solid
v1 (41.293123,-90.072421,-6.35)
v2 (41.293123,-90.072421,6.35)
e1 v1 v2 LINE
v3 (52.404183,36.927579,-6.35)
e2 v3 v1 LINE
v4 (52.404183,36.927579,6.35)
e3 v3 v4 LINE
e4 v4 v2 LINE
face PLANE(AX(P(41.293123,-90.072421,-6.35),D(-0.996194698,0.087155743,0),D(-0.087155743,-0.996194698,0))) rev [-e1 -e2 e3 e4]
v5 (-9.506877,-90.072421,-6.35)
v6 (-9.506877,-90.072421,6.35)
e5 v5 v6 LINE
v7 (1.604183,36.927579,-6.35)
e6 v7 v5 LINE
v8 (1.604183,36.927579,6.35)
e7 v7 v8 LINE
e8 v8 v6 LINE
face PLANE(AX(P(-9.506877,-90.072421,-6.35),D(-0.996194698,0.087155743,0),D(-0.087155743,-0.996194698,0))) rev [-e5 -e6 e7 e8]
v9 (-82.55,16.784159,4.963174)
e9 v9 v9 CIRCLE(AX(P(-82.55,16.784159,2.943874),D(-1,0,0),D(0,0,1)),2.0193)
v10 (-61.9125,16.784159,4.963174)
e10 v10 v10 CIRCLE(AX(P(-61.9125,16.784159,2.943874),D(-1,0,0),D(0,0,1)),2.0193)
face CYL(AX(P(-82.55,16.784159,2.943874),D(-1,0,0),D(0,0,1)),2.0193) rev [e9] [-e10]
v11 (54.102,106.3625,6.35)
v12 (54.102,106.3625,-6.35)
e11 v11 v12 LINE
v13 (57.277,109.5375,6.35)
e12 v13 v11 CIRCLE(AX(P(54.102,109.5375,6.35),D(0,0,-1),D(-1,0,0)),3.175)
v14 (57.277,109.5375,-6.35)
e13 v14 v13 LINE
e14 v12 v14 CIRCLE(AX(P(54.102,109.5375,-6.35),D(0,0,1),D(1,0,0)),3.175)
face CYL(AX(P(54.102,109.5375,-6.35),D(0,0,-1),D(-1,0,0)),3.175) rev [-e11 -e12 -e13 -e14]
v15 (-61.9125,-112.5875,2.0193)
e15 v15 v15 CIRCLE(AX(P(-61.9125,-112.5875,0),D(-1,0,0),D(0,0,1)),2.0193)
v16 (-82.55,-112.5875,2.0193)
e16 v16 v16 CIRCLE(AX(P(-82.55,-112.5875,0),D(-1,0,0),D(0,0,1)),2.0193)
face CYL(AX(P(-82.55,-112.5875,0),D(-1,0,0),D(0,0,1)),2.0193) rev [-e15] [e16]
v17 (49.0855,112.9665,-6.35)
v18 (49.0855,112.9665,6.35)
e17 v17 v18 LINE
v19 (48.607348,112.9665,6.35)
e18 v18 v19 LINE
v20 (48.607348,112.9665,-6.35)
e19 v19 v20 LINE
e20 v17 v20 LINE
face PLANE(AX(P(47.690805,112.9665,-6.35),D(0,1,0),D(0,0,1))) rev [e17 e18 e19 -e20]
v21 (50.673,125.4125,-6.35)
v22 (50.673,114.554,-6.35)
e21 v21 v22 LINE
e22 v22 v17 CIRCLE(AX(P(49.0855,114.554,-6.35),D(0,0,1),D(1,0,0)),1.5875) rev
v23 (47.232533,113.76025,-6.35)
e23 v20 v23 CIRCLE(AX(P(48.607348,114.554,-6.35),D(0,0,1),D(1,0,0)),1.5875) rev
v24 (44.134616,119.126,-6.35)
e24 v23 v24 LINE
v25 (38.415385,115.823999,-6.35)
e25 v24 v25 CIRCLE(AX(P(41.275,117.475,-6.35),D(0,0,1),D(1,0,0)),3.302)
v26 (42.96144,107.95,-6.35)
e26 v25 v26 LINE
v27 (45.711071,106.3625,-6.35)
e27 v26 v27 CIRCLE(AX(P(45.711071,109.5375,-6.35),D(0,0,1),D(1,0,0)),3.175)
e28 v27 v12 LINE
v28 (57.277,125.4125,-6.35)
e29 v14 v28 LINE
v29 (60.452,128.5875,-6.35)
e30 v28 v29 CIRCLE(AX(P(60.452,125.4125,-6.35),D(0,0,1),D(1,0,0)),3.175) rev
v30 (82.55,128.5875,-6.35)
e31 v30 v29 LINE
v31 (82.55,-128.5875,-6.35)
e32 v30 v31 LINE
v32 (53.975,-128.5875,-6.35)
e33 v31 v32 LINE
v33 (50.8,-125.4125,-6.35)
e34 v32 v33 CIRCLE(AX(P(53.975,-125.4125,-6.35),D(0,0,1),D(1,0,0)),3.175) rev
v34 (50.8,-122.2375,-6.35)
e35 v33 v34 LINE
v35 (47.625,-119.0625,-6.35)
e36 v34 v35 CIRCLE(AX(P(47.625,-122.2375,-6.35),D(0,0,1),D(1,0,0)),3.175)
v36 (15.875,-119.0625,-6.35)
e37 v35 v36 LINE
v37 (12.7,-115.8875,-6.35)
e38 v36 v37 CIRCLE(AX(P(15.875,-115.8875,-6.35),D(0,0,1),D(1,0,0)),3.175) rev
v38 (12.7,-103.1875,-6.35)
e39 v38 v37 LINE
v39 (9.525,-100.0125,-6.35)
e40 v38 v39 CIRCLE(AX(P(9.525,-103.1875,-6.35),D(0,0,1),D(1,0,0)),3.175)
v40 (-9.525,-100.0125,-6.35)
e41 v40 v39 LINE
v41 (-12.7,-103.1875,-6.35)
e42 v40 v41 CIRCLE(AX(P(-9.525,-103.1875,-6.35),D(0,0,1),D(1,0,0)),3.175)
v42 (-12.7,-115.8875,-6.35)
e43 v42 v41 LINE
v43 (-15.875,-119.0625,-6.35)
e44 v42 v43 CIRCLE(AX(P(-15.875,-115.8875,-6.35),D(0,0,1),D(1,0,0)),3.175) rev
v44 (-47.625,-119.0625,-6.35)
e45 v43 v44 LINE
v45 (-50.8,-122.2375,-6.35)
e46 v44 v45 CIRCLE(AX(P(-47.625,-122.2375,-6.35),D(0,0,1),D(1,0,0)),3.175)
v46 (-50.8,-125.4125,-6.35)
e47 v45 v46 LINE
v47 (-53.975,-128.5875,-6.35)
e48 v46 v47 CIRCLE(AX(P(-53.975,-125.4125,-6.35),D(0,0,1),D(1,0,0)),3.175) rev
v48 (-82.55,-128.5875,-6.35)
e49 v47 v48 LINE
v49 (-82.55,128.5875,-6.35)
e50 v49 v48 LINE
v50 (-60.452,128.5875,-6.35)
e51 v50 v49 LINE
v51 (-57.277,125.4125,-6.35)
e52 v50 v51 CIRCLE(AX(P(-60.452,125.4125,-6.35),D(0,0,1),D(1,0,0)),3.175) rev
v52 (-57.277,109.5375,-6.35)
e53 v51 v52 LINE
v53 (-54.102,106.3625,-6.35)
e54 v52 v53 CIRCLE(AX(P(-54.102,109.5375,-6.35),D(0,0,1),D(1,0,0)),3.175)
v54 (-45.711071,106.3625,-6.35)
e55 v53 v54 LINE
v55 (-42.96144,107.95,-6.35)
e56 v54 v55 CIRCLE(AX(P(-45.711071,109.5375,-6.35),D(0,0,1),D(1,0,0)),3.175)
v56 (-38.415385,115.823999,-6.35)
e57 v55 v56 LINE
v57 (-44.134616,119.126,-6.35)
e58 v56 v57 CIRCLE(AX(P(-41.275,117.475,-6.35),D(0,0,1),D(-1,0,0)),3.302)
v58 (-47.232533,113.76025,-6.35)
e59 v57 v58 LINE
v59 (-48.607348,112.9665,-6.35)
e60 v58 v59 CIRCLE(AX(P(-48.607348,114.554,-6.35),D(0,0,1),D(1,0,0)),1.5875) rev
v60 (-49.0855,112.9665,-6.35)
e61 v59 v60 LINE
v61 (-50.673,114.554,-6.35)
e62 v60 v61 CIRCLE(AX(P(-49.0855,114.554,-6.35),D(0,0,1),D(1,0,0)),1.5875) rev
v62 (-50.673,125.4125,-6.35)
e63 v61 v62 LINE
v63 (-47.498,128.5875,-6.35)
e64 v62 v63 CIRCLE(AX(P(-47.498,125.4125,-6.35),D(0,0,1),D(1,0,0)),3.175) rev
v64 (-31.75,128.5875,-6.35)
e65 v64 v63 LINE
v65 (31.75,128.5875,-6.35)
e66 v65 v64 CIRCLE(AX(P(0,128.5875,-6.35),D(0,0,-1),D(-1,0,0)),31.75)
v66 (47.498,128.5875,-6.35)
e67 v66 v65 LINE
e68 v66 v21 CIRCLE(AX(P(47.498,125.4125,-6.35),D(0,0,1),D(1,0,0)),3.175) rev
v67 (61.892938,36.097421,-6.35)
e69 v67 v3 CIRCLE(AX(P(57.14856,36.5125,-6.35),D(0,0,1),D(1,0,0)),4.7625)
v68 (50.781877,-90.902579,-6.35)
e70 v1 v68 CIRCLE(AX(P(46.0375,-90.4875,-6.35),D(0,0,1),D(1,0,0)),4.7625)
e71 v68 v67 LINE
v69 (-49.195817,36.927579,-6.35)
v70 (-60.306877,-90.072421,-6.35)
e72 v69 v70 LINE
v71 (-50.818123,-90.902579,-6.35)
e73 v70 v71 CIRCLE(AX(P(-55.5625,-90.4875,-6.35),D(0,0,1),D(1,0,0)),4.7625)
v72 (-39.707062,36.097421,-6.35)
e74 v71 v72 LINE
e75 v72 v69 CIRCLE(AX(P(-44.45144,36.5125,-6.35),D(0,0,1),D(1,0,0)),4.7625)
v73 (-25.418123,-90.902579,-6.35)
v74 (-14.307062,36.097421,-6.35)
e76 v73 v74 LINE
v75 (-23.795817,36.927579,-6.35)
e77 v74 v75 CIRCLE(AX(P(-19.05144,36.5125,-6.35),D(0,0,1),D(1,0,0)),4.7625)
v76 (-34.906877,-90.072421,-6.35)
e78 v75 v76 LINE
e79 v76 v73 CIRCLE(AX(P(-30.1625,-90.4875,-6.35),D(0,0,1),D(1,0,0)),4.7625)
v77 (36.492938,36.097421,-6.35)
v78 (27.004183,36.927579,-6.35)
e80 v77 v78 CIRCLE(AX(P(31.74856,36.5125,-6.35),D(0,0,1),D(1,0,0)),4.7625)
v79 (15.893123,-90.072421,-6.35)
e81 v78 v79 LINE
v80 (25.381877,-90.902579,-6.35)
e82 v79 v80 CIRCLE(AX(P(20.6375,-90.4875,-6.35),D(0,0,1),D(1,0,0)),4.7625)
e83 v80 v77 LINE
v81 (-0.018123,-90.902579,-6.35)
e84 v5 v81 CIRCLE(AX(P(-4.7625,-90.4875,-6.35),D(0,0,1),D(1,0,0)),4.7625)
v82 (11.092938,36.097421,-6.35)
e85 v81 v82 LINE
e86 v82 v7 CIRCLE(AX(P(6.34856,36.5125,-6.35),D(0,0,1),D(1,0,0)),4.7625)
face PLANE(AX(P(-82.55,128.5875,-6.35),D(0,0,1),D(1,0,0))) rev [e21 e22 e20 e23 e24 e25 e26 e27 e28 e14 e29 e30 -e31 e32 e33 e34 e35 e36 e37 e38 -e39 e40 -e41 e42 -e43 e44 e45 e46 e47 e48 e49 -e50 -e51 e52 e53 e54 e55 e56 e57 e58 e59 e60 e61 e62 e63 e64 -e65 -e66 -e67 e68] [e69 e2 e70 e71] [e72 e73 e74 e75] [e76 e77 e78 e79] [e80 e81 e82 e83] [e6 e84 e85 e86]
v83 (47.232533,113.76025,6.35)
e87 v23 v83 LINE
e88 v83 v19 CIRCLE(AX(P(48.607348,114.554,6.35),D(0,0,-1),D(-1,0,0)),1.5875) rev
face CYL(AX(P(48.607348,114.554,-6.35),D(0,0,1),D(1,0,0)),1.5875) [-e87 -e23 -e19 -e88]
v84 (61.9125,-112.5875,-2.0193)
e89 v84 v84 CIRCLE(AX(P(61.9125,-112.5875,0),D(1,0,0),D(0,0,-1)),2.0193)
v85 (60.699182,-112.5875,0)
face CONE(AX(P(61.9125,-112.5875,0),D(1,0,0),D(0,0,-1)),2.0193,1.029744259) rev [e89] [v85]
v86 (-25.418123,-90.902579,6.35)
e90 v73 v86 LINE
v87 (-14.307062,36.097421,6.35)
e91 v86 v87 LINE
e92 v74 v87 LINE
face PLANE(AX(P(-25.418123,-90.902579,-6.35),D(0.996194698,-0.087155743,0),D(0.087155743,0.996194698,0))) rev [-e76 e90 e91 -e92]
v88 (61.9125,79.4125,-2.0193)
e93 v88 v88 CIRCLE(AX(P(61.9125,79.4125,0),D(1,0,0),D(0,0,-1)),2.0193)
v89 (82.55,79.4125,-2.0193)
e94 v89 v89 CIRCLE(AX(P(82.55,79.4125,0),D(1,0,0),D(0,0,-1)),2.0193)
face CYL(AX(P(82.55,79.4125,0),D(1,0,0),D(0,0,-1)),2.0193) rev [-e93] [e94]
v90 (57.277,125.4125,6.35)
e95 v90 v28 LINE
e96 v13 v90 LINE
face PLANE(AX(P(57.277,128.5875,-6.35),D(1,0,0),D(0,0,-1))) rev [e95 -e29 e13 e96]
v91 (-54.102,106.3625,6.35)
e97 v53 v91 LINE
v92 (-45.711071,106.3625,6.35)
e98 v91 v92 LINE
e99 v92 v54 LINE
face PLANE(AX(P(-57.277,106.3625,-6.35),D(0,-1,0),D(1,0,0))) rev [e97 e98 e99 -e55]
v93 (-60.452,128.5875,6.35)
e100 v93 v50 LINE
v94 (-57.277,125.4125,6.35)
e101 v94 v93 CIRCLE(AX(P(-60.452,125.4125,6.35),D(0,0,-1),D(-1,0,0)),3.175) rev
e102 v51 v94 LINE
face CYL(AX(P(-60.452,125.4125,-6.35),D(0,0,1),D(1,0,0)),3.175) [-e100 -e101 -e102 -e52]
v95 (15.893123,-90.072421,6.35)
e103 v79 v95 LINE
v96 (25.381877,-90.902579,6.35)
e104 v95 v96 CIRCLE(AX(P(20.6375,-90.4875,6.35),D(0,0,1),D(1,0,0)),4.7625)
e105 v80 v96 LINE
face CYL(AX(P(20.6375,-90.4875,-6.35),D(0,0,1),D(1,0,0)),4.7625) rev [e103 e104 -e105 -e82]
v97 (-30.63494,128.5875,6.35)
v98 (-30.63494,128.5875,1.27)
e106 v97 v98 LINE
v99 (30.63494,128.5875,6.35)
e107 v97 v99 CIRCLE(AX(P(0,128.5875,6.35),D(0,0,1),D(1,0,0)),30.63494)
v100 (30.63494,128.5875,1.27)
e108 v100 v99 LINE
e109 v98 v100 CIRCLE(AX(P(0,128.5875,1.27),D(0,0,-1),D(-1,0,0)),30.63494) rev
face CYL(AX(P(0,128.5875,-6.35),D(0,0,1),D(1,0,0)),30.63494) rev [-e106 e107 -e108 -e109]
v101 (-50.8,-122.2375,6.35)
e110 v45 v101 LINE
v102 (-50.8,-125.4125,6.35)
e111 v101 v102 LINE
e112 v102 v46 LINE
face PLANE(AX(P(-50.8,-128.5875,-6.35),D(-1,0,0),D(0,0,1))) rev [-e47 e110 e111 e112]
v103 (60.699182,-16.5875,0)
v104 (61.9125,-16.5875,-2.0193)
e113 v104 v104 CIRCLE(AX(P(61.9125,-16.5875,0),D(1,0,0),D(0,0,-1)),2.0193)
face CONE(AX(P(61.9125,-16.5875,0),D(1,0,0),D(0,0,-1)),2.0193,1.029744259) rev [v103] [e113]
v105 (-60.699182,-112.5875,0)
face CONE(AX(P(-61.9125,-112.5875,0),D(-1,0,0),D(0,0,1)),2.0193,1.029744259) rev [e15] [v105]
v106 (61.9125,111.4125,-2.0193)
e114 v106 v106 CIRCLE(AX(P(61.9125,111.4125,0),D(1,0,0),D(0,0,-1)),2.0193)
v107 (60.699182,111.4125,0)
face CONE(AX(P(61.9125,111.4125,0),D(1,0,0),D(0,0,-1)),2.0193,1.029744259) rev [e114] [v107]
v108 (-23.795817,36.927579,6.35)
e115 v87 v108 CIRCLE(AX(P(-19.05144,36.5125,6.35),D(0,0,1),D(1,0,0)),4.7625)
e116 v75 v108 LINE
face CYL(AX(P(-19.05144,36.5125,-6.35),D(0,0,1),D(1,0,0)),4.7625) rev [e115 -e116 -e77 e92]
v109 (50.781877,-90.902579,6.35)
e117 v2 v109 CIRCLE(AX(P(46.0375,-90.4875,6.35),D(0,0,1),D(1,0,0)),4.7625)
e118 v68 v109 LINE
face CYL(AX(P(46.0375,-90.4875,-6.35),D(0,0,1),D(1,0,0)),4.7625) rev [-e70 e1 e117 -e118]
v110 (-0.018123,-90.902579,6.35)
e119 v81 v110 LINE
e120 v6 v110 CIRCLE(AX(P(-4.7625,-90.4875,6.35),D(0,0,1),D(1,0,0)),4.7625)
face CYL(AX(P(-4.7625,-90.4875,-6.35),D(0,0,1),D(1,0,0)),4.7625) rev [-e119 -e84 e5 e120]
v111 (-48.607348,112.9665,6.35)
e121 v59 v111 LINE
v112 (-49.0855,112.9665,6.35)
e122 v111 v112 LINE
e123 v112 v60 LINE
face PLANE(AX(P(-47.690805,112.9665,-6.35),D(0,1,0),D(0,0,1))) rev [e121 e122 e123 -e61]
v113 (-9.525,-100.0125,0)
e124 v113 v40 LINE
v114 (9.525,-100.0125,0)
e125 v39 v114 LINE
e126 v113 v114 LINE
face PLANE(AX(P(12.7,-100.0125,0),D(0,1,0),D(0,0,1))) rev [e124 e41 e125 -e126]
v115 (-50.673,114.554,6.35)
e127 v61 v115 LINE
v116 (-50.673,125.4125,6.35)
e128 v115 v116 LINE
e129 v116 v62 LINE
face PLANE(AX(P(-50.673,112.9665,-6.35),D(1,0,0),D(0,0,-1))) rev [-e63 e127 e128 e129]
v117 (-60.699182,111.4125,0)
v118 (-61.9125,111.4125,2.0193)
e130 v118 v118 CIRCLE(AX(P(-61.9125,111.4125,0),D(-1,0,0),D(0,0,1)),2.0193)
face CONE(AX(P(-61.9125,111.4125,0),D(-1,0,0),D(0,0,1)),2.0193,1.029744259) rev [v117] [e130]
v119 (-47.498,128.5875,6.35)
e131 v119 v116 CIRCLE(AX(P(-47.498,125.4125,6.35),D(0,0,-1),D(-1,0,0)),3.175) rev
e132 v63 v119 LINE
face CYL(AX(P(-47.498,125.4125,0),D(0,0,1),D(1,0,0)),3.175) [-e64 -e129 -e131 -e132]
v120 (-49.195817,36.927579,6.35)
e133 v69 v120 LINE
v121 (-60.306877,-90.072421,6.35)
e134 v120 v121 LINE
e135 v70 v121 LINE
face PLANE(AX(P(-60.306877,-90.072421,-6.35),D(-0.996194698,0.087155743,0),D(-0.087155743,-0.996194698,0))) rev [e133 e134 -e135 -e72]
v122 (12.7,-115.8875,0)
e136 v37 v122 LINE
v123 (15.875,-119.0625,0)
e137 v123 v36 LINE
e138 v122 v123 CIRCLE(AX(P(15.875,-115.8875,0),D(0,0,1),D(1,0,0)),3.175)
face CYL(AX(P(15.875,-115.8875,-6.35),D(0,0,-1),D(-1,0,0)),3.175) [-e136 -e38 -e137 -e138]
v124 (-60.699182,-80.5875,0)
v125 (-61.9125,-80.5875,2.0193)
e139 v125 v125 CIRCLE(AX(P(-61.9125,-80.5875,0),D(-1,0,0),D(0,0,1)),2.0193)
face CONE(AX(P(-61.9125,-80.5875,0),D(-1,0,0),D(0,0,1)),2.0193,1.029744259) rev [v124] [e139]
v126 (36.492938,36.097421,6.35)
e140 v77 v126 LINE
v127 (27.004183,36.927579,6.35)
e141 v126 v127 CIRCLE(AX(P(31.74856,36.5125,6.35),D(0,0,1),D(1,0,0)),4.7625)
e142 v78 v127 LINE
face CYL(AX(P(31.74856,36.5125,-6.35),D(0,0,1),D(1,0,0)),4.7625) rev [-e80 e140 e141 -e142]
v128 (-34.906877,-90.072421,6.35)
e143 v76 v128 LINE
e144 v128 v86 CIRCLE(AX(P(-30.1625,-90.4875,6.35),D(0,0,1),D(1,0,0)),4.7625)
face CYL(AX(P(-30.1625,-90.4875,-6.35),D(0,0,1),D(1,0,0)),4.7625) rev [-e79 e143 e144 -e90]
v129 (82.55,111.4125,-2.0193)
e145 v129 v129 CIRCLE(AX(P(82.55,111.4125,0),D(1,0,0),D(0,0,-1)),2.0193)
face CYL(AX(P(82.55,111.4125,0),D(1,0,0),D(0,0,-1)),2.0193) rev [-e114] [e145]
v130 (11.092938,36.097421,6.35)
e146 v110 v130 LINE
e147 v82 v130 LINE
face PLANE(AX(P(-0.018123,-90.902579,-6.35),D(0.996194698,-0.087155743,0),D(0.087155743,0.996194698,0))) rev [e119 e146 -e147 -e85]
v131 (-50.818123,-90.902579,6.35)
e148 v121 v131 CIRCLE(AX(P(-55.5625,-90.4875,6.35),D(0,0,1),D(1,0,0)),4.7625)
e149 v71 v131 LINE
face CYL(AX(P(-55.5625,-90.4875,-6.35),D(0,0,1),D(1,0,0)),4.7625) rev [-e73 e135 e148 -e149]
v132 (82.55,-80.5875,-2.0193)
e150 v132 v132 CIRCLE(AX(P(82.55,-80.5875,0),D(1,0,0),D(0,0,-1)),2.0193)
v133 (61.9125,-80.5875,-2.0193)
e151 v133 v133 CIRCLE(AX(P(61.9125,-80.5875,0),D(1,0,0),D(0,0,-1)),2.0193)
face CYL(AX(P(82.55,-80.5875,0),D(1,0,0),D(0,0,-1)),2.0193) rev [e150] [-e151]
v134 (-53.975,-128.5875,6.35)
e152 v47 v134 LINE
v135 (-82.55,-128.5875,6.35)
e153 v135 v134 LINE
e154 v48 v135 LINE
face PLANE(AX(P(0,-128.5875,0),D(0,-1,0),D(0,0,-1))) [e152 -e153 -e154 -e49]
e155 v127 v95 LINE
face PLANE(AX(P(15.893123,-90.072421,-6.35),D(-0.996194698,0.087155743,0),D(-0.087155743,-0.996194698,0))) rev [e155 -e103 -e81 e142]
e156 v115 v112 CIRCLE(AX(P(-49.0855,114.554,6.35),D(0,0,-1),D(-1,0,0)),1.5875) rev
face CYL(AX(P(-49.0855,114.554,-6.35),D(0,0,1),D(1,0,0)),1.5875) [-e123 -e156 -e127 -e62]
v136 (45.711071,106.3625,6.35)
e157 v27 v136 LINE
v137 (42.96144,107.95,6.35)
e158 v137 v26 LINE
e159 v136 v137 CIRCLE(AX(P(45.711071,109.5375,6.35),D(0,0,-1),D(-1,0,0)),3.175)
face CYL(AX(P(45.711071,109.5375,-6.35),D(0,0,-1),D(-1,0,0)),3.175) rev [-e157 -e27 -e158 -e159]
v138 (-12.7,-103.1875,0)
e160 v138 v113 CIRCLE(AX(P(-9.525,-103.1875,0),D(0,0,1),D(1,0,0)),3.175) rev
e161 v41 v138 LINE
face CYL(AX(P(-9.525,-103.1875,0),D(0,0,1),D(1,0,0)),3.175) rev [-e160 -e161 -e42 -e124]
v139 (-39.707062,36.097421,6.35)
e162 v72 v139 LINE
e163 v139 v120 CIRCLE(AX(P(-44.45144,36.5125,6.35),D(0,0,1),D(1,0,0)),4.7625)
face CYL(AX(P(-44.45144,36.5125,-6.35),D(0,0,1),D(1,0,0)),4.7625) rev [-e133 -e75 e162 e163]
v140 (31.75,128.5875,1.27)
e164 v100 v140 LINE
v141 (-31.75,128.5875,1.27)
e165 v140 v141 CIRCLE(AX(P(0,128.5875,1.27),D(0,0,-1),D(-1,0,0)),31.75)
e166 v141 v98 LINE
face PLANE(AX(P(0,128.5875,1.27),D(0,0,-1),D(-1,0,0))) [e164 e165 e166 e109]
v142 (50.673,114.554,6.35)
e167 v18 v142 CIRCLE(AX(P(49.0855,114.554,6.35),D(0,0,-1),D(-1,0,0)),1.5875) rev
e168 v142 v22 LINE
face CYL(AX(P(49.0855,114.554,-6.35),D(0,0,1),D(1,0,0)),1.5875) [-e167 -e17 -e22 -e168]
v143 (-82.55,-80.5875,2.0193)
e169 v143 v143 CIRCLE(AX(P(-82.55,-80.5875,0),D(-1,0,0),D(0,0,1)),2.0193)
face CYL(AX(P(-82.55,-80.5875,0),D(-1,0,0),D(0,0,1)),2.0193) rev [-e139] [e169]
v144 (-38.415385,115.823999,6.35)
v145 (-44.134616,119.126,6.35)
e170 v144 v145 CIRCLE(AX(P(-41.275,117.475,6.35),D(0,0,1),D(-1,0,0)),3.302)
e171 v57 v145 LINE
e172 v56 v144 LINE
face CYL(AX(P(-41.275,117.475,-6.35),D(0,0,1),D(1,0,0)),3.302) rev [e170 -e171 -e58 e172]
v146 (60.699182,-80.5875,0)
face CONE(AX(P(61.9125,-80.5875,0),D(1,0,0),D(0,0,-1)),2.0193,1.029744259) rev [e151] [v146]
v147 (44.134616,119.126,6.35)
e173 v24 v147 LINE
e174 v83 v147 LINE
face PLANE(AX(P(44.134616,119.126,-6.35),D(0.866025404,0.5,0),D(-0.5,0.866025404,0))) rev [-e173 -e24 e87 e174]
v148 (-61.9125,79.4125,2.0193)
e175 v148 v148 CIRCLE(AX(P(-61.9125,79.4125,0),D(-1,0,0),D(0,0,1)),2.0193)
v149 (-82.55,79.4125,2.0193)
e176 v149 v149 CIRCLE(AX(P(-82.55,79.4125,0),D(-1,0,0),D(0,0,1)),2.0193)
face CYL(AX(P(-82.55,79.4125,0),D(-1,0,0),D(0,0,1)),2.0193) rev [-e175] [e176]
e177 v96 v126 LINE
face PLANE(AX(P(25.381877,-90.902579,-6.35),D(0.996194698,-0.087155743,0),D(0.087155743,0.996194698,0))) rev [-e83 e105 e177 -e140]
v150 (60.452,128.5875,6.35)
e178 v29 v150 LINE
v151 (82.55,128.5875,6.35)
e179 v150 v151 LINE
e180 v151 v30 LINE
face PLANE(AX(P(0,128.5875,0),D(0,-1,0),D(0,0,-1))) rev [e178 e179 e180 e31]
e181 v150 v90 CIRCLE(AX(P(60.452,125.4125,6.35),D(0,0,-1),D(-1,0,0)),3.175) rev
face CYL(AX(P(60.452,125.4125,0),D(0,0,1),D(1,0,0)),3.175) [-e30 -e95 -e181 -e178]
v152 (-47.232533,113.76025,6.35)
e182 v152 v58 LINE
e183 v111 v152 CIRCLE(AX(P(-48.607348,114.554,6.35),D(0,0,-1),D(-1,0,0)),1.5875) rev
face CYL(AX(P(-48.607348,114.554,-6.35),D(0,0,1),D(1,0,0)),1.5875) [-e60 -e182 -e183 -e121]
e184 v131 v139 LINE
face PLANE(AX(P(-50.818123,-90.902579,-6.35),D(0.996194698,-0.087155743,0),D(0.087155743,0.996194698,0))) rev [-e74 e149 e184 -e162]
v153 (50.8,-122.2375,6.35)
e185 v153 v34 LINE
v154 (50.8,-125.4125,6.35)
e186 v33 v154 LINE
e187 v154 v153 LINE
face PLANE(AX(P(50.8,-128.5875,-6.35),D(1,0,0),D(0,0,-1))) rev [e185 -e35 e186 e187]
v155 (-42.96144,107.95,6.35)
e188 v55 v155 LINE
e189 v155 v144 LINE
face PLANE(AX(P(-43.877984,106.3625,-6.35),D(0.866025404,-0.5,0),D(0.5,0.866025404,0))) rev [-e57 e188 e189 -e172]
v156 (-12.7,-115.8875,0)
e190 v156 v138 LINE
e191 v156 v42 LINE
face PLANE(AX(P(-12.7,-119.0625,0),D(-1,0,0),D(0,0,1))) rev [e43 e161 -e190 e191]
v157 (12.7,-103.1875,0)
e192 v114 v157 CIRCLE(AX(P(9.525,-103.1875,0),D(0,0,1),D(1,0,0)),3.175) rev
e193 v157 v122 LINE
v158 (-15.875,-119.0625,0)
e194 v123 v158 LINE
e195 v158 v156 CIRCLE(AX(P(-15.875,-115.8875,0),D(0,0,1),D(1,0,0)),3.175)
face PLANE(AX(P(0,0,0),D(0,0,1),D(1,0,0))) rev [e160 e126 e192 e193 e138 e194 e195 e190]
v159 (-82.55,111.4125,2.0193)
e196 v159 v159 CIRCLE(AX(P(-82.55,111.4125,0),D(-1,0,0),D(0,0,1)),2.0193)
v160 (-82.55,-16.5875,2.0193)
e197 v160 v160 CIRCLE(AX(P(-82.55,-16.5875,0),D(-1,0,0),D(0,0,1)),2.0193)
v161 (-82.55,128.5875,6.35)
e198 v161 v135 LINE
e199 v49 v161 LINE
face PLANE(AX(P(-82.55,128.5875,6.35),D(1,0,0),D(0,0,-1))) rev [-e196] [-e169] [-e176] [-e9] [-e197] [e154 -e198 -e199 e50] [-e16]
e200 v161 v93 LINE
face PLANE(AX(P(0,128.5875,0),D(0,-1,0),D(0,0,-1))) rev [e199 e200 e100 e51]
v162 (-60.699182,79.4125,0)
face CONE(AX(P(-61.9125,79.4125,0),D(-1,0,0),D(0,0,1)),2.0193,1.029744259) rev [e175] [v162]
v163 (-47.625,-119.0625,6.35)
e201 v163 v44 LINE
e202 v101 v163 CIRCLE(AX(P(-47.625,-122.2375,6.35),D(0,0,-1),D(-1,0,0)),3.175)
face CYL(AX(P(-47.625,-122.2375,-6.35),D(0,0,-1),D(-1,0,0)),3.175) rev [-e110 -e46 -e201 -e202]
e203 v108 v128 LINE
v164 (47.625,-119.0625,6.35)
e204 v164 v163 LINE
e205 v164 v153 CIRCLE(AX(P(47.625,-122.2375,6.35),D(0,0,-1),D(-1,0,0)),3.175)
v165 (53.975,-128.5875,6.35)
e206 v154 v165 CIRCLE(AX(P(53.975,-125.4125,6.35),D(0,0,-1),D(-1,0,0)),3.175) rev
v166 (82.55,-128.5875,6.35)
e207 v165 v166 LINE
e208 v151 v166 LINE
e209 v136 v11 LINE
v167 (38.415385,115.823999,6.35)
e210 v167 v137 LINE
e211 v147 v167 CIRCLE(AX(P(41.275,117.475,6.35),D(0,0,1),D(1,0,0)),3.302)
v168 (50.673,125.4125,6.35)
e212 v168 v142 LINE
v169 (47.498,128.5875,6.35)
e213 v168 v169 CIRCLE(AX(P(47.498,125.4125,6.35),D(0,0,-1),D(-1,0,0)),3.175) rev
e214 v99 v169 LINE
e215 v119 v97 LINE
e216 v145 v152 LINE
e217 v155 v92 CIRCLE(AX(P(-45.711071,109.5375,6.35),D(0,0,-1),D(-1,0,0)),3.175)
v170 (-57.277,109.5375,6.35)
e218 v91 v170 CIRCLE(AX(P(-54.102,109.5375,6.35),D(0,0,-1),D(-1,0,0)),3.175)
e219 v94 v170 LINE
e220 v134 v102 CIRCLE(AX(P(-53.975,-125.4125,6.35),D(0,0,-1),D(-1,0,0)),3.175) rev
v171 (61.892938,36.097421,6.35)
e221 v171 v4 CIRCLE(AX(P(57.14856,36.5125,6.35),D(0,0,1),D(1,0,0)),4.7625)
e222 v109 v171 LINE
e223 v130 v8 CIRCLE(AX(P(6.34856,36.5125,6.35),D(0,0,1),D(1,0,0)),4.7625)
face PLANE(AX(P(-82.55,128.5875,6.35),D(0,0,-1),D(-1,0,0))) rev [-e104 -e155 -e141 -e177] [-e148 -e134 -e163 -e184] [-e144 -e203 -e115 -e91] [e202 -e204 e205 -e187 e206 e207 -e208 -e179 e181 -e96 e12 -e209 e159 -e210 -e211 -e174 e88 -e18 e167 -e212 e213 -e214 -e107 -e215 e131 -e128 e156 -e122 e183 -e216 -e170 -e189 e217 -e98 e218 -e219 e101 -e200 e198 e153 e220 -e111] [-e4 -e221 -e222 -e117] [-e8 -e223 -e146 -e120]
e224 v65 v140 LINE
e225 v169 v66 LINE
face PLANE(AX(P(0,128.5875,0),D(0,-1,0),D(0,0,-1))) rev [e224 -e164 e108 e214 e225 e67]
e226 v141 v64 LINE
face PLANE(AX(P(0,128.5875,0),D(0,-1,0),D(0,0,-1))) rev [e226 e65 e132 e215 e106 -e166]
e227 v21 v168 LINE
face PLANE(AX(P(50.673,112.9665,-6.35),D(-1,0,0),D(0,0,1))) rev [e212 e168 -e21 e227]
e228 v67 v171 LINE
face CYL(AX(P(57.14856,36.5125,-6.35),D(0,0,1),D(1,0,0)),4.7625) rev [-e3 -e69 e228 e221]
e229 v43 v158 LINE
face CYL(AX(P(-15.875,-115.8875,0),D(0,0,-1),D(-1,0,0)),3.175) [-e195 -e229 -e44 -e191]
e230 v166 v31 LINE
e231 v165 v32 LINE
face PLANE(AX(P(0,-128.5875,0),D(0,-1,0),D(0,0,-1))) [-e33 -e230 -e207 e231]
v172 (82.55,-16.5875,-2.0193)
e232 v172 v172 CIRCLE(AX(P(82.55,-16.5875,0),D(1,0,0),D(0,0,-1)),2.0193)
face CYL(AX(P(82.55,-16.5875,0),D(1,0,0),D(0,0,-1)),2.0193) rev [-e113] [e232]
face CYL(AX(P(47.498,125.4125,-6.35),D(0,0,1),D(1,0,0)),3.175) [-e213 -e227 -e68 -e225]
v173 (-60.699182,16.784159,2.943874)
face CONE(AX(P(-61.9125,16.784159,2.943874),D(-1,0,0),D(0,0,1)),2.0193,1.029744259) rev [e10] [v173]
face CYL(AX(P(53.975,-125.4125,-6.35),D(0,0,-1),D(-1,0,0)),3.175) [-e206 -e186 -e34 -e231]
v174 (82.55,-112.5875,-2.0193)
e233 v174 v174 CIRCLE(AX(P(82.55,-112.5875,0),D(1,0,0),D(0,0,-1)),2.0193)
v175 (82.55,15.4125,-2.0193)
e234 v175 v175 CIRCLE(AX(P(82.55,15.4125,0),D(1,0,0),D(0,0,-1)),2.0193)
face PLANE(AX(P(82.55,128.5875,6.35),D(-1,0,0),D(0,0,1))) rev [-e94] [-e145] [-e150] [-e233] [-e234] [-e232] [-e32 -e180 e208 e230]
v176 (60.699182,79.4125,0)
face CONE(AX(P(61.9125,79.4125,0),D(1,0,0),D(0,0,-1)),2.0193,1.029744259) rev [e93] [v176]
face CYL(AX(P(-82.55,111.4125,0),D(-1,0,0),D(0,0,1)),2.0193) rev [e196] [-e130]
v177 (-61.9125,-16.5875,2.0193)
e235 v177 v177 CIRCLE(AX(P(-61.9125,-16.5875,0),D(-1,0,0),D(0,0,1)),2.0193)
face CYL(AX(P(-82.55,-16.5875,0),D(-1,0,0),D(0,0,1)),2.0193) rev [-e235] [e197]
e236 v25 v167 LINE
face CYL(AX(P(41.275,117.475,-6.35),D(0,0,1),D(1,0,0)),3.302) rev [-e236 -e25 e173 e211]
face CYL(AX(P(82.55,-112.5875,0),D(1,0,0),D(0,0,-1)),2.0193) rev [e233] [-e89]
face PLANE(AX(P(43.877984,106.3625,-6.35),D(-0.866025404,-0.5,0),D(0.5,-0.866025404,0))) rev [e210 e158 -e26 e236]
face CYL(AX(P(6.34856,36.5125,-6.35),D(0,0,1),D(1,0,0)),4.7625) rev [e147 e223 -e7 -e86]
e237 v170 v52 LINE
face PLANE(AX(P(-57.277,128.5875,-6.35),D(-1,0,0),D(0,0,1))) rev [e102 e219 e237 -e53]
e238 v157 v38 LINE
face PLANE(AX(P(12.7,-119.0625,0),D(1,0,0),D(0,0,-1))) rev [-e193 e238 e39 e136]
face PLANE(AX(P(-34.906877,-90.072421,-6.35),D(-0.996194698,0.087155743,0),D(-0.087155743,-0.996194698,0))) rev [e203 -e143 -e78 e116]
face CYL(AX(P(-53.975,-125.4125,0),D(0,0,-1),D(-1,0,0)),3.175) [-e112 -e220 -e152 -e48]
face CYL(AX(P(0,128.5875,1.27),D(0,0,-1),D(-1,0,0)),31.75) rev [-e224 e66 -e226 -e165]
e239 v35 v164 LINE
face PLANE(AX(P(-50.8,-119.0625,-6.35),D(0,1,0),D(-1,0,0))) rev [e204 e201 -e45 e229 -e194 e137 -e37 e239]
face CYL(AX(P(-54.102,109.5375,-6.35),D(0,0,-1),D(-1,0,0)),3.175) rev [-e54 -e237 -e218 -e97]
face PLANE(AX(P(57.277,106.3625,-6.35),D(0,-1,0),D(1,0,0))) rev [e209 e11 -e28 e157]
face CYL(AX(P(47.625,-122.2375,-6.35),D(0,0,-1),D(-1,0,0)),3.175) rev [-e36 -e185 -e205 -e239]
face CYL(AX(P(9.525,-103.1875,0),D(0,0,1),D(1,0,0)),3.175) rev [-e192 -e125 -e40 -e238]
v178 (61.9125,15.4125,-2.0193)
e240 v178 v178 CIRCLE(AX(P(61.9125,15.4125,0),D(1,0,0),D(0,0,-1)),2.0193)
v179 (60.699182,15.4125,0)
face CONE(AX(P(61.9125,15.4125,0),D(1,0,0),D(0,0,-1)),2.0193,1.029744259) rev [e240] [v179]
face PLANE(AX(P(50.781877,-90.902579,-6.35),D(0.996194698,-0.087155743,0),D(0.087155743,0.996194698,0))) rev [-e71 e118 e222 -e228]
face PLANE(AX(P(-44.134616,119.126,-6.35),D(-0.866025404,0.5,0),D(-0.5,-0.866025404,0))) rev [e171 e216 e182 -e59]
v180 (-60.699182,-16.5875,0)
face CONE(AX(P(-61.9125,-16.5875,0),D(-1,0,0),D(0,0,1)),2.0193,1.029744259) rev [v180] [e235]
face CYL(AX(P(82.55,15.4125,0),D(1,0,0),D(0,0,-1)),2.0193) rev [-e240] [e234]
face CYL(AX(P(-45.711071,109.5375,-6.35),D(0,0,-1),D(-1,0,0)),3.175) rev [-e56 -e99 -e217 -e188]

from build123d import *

# Parameters (mm, degrees)
SKETCH1_W                       = 165.1
SKETCH1_H                       = 12.7
BOSS_EXTRUDE1_DEPTH             = 128.5875
SKETCH2_R                       = 30.63494
CUT_EXTRUDE1_DEPTH              = 154.33146336
SKETCH3_R                       = 31.75
CUT_EXTRUDE2_DEPTH              = 7.62
CUT_EXTRUDE3_DEPTH              = 154.33146336
FILLET1_R                       = 3.175
FILLET2_R                       = 1.5875
SKETCH5_W                       = 101.6
SKETCH5_H                       = 9.525
CUT_EXTRUDE4_DEPTH              = 154.33146336
FILLET3_R                       = 3.175
F_21_0_159_DIAMETER_HOLE2_D     = 4.0386
F_21_0_159_DIAMETER_HOLE2_DEPTH = 20.6375
F_21_0_159_DIAMETER_HOLE2_TIP   = 1.213317848
CUT_EXTRUDE5_DEPTH              = 154.33146336
SKETCH11_W                      = 25.4
SKETCH11_H                      = 19.05
CUT_EXTRUDE6_DEPTH              = 6.35
FILLET4_R                       = 3.175


# Read off the part's stored shape, not the designer's step: #21 (0.159) Diameter Hole1
with BuildPart() as part:
    # Sketch1 → Boss-Extrude1 (new, symmetric)
    with BuildSketch(Plane(origin=(0, 0, 0), x_dir=(1, 0, 0), z_dir=(0, 1, 0))):
        Rectangle(SKETCH1_W, SKETCH1_H)
    extrude(amount=BOSS_EXTRUDE1_DEPTH, both=True)

    # Sketch2 → Cut-Extrude1 (cut, through all)
    with BuildSketch(Plane.XY.offset(6.35)):
        with Locations((0, 128.5875)):
            Circle(SKETCH2_R)
    extrude(amount=-CUT_EXTRUDE1_DEPTH, mode=Mode.SUBTRACT)

    # Sketch3 → Cut-Extrude2 (cut)
    with BuildSketch(Plane(origin=(0, 0, -6.35), x_dir=(-1, 0, 0), z_dir=(0, 0, -1))):
        with Locations((0, 128.5875)):
            Circle(SKETCH3_R)
    extrude(amount=-CUT_EXTRUDE2_DEPTH, mode=Mode.SUBTRACT)

    # Sketch4 → Cut-Extrude3 (cut, through all)
    with BuildSketch(Plane.XY.offset(6.35)):
        with BuildLine():
            Line((57.277, 128.5875), (57.277, 106.3625))
            Line((57.277, 106.3625), (43.877983689, 106.3625))
            Line((43.877983689, 106.3625), (38.415384653, 115.823999072))
            ThreePointArc((38.415384653, 115.823999072), (39.623999536, 120.334615615), (44.134615883, 119.126))
            Line((44.134615883, 119.126), (47.690804866, 112.9665))
            Line((47.690804866, 112.9665), (50.673, 112.9665))
            Line((50.673, 112.9665), (50.673, 128.5875))
            Line((50.673, 128.5875), (57.277, 128.5875))
        make_face()
        with BuildLine():
            Line((-50.673, 128.5875), (-57.277, 128.5875))
            Line((-57.277, 128.5875), (-57.277, 106.3625))
            Line((-57.277, 106.3625), (-43.877983689, 106.3625))
            Line((-43.877983689, 106.3625), (-38.415384653, 115.823999072))
            ThreePointArc((-38.415384653, 115.823999072), (-39.623999536, 120.334615615), (-44.134615883, 119.126))
            Line((-44.134615883, 119.126), (-47.690804866, 112.9665))
            Line((-47.690804866, 112.9665), (-50.673, 112.9665))
            Line((-50.673, 112.9665), (-50.673, 128.5875))
        make_face()
    extrude(amount=-CUT_EXTRUDE3_DEPTH, mode=Mode.SUBTRACT)

    # Fillet1
    fillet1_edges = [part.edges().sort_by_distance(p)[0] for p in [
        (50.673, 128.5875, 0),
        (57.277, 128.5875, 0),
        (57.277, 106.3625, 0),
        (43.877983689, 106.3625, 0),
        (-43.877983689, 106.3625, 0),
        (-57.277, 106.3625, 0),
        (-57.277, 128.5875, 0),
        (-50.673, 128.5875, 0),
    ]]
    fillet(fillet1_edges, radius=FILLET1_R)

    # Fillet2
    fillet2_edges = [part.edges().sort_by_distance(p)[0] for p in [
        (47.690804866, 112.9665, 0),
        (50.673, 112.9665, 0),
        (-50.673, 112.9665, 0),
        (-47.690804866, 112.9665, 0),
    ]]
    fillet(fillet2_edges, radius=FILLET2_R)

    # Sketch5 → Cut-Extrude4 (cut, through all)
    with BuildSketch(Plane.XY.offset(6.35)):
        with Locations((0, -123.825)):
            Rectangle(SKETCH5_W, SKETCH5_H)
    extrude(amount=-CUT_EXTRUDE4_DEPTH, mode=Mode.SUBTRACT)

    # Fillet3
    fillet3_edges = [part.edges().sort_by_distance(p)[0] for p in [
        (-50.8, -128.5875, 0),
        (-50.8, -119.0625, 0),
        (50.8, -119.0625, 0),
        (50.8, -128.5875, 0),
    ]]
    fillet(fillet3_edges, radius=FILLET3_R)

    # #21 (0.159) Diameter Hole1 outline → #21 (0.159) Diameter Hole1 (revolve, cut)
    with BuildSketch(Plane(origin=(0, 111.41250006, 0), x_dir=(0, 1, 0), z_dir=(0, 0, -1))):
        Polygon((0, 82.55), (0, 60.699182152), (2.0193, 61.9125), (2.0193, 82.55), align=None)
    revolve(axis=Axis((0, 111.41250006, 0), (1, 0, 0)), mode=Mode.SUBTRACT)

    # 21 _0.159_ Diameter Hole1 2 outline → 21 _0.159_ Diameter Hole1 2 (revolve, cut)
    with BuildSketch(Plane(origin=(0, 79.412500052, 0), x_dir=(0, 1, 0), z_dir=(0, 0, -1))):
        Polygon((0, 82.55), (0, 60.699182152), (2.0193, 61.9125), (2.0193, 82.55), align=None)
    revolve(axis=Axis((0, 79.412500052, 0), (1, 0, 0)), mode=Mode.SUBTRACT)

    # 21 _0.159_ Diameter Hole1 3 outline → 21 _0.159_ Diameter Hole1 3 (revolve, cut)
    with BuildSketch(Plane(origin=(0, 15.412500036, 0), x_dir=(0, 1, 0), z_dir=(0, 0, -1))):
        Polygon((0, 82.55), (0, 60.699182152), (2.0193, 61.9125), (2.0193, 82.55), align=None)
    revolve(axis=Axis((0, 15.412500036, 0), (1, 0, 0)), mode=Mode.SUBTRACT)

    # 21 _0.159_ Diameter Hole1 4 outline → 21 _0.159_ Diameter Hole1 4 (revolve, cut)
    with BuildSketch(Plane(origin=(0, -16.587499972, 0), x_dir=(0, 1, 0), z_dir=(0, 0, -1))):
        Polygon((0, 82.55), (0, 60.699182152), (2.0193, 61.9125), (2.0193, 82.55), align=None)
    revolve(axis=Axis((0, -16.587499972, 0), (1, 0, 0)), mode=Mode.SUBTRACT)

    # 21 _0.159_ Diameter Hole1 5 outline → 21 _0.159_ Diameter Hole1 5 (revolve, cut)
    with BuildSketch(Plane(origin=(0, -80.587499988, 0), x_dir=(0, 1, 0), z_dir=(0, 0, -1))):
        Polygon((0, 82.55), (0, 60.699182152), (2.0193, 61.9125), (2.0193, 82.55), align=None)
    revolve(axis=Axis((0, -80.587499988, 0), (1, 0, 0)), mode=Mode.SUBTRACT)

    # 21 _0.159_ Diameter Hole1 6 outline → 21 _0.159_ Diameter Hole1 6 (revolve, cut)
    with BuildSketch(Plane(origin=(0, -112.587499996, 0), x_dir=(0, 1, 0), z_dir=(0, 0, -1))):
        Polygon((0, 82.55), (0, 60.699182152), (2.0193, 61.9125), (2.0193, 82.55), align=None)
    revolve(axis=Axis((0, -112.587499996, 0), (1, 0, 0)), mode=Mode.SUBTRACT)

    # #21 (0.159) Diameter Hole2
    with Locations(Plane.ZY.offset(82.55)):
        with Locations((0, -112.587499996), (0, -80.587499988), (0, -16.587499972), (2.943873534, 16.784159444), (0, 79.412500052), (0, 111.41250006)):
            Hole(F_21_0_159_DIAMETER_HOLE2_D / 2, depth=F_21_0_159_DIAMETER_HOLE2_DEPTH)
            with Locations((0, 0, -(F_21_0_159_DIAMETER_HOLE2_DEPTH + F_21_0_159_DIAMETER_HOLE2_TIP / 2))):  # 118° drill point
                Cone(0, F_21_0_159_DIAMETER_HOLE2_D / 2, F_21_0_159_DIAMETER_HOLE2_TIP, mode=Mode.SUBTRACT)

    # Sketch10 → Cut-Extrude5 (cut, through all)
    with BuildSketch(Plane.XY.offset(6.35)):
        with BuildLine():
            Line((-60.30687725, -90.072420775), (-49.195816982, 36.927579225))
            ThreePointArc((-49.195816982, 36.927579225), (-44.036360507, 41.25687725), (-39.707062483, 36.097420775))
            Line((-39.707062483, 36.097420775), (-50.81812275, -90.902579225))
            ThreePointArc((-50.81812275, -90.902579225), (-55.977579225, -95.23187725), (-60.30687725, -90.072420775))
        make_face()
        with BuildLine():
            Line((-25.41812275, -90.902579225), (-14.307062483, 36.097420775))
            ThreePointArc((-14.307062483, 36.097420775), (-18.636360507, 41.25687725), (-23.795816982, 36.927579225))
            Line((-23.795816982, 36.927579225), (-34.90687725, -90.072420775))
            ThreePointArc((-34.90687725, -90.072420775), (-30.577579225, -95.23187725), (-25.41812275, -90.902579225))
        make_face()
        with BuildLine():
            Line((-0.01812275, -90.902579225), (11.092937517, 36.097420775))
            ThreePointArc((11.092937517, 36.097420775), (6.763639493, 41.25687725), (1.604183018, 36.927579225))
            Line((1.604183018, 36.927579225), (-9.50687725, -90.072420775))
            ThreePointArc((-9.50687725, -90.072420775), (-5.177579225, -95.23187725), (-0.01812275, -90.902579225))
        make_face()
        with BuildLine():
            Line((25.38187725, -90.902579225), (36.492937517, 36.097420775))
            ThreePointArc((36.492937517, 36.097420775), (32.163639493, 41.25687725), (27.004183018, 36.927579225))
            Line((27.004183018, 36.927579225), (15.89312275, -90.072420775))
            ThreePointArc((15.89312275, -90.072420775), (20.222420775, -95.23187725), (25.38187725, -90.902579225))
        make_face()
        with BuildLine():
            Line((50.78187725, -90.902579225), (61.892937517, 36.097420775))
            ThreePointArc((61.892937517, 36.097420775), (57.563639493, 41.25687725), (52.404183018, 36.927579225))
            Line((52.404183018, 36.927579225), (41.29312275, -90.072420775))
            ThreePointArc((41.29312275, -90.072420775), (45.622420775, -95.23187725), (50.78187725, -90.902579225))
        make_face()
    extrude(amount=-CUT_EXTRUDE5_DEPTH, mode=Mode.SUBTRACT)

    # Sketch11 → Cut-Extrude6 (cut)
    with BuildSketch(Plane(origin=(0, 0, -6.35), x_dir=(-1, 0, 0), z_dir=(0, 0, -1))):
        with Locations((0, -109.5375)):
            Rectangle(SKETCH11_W, SKETCH11_H)
    extrude(amount=-CUT_EXTRUDE6_DEPTH, mode=Mode.SUBTRACT)

    # Fillet4
    fillet4_edges = [part.edges().sort_by_distance(p)[0] for p in [
        (12.7, -119.0625, -3.175),
        (12.7, -100.0125, -3.175),
        (-12.7, -100.0125, -3.175),
        (-12.7, -119.0625, -3.175),
    ]]
    fillet(fillet4_edges, radius=FILLET4_R)


solid = part.part
